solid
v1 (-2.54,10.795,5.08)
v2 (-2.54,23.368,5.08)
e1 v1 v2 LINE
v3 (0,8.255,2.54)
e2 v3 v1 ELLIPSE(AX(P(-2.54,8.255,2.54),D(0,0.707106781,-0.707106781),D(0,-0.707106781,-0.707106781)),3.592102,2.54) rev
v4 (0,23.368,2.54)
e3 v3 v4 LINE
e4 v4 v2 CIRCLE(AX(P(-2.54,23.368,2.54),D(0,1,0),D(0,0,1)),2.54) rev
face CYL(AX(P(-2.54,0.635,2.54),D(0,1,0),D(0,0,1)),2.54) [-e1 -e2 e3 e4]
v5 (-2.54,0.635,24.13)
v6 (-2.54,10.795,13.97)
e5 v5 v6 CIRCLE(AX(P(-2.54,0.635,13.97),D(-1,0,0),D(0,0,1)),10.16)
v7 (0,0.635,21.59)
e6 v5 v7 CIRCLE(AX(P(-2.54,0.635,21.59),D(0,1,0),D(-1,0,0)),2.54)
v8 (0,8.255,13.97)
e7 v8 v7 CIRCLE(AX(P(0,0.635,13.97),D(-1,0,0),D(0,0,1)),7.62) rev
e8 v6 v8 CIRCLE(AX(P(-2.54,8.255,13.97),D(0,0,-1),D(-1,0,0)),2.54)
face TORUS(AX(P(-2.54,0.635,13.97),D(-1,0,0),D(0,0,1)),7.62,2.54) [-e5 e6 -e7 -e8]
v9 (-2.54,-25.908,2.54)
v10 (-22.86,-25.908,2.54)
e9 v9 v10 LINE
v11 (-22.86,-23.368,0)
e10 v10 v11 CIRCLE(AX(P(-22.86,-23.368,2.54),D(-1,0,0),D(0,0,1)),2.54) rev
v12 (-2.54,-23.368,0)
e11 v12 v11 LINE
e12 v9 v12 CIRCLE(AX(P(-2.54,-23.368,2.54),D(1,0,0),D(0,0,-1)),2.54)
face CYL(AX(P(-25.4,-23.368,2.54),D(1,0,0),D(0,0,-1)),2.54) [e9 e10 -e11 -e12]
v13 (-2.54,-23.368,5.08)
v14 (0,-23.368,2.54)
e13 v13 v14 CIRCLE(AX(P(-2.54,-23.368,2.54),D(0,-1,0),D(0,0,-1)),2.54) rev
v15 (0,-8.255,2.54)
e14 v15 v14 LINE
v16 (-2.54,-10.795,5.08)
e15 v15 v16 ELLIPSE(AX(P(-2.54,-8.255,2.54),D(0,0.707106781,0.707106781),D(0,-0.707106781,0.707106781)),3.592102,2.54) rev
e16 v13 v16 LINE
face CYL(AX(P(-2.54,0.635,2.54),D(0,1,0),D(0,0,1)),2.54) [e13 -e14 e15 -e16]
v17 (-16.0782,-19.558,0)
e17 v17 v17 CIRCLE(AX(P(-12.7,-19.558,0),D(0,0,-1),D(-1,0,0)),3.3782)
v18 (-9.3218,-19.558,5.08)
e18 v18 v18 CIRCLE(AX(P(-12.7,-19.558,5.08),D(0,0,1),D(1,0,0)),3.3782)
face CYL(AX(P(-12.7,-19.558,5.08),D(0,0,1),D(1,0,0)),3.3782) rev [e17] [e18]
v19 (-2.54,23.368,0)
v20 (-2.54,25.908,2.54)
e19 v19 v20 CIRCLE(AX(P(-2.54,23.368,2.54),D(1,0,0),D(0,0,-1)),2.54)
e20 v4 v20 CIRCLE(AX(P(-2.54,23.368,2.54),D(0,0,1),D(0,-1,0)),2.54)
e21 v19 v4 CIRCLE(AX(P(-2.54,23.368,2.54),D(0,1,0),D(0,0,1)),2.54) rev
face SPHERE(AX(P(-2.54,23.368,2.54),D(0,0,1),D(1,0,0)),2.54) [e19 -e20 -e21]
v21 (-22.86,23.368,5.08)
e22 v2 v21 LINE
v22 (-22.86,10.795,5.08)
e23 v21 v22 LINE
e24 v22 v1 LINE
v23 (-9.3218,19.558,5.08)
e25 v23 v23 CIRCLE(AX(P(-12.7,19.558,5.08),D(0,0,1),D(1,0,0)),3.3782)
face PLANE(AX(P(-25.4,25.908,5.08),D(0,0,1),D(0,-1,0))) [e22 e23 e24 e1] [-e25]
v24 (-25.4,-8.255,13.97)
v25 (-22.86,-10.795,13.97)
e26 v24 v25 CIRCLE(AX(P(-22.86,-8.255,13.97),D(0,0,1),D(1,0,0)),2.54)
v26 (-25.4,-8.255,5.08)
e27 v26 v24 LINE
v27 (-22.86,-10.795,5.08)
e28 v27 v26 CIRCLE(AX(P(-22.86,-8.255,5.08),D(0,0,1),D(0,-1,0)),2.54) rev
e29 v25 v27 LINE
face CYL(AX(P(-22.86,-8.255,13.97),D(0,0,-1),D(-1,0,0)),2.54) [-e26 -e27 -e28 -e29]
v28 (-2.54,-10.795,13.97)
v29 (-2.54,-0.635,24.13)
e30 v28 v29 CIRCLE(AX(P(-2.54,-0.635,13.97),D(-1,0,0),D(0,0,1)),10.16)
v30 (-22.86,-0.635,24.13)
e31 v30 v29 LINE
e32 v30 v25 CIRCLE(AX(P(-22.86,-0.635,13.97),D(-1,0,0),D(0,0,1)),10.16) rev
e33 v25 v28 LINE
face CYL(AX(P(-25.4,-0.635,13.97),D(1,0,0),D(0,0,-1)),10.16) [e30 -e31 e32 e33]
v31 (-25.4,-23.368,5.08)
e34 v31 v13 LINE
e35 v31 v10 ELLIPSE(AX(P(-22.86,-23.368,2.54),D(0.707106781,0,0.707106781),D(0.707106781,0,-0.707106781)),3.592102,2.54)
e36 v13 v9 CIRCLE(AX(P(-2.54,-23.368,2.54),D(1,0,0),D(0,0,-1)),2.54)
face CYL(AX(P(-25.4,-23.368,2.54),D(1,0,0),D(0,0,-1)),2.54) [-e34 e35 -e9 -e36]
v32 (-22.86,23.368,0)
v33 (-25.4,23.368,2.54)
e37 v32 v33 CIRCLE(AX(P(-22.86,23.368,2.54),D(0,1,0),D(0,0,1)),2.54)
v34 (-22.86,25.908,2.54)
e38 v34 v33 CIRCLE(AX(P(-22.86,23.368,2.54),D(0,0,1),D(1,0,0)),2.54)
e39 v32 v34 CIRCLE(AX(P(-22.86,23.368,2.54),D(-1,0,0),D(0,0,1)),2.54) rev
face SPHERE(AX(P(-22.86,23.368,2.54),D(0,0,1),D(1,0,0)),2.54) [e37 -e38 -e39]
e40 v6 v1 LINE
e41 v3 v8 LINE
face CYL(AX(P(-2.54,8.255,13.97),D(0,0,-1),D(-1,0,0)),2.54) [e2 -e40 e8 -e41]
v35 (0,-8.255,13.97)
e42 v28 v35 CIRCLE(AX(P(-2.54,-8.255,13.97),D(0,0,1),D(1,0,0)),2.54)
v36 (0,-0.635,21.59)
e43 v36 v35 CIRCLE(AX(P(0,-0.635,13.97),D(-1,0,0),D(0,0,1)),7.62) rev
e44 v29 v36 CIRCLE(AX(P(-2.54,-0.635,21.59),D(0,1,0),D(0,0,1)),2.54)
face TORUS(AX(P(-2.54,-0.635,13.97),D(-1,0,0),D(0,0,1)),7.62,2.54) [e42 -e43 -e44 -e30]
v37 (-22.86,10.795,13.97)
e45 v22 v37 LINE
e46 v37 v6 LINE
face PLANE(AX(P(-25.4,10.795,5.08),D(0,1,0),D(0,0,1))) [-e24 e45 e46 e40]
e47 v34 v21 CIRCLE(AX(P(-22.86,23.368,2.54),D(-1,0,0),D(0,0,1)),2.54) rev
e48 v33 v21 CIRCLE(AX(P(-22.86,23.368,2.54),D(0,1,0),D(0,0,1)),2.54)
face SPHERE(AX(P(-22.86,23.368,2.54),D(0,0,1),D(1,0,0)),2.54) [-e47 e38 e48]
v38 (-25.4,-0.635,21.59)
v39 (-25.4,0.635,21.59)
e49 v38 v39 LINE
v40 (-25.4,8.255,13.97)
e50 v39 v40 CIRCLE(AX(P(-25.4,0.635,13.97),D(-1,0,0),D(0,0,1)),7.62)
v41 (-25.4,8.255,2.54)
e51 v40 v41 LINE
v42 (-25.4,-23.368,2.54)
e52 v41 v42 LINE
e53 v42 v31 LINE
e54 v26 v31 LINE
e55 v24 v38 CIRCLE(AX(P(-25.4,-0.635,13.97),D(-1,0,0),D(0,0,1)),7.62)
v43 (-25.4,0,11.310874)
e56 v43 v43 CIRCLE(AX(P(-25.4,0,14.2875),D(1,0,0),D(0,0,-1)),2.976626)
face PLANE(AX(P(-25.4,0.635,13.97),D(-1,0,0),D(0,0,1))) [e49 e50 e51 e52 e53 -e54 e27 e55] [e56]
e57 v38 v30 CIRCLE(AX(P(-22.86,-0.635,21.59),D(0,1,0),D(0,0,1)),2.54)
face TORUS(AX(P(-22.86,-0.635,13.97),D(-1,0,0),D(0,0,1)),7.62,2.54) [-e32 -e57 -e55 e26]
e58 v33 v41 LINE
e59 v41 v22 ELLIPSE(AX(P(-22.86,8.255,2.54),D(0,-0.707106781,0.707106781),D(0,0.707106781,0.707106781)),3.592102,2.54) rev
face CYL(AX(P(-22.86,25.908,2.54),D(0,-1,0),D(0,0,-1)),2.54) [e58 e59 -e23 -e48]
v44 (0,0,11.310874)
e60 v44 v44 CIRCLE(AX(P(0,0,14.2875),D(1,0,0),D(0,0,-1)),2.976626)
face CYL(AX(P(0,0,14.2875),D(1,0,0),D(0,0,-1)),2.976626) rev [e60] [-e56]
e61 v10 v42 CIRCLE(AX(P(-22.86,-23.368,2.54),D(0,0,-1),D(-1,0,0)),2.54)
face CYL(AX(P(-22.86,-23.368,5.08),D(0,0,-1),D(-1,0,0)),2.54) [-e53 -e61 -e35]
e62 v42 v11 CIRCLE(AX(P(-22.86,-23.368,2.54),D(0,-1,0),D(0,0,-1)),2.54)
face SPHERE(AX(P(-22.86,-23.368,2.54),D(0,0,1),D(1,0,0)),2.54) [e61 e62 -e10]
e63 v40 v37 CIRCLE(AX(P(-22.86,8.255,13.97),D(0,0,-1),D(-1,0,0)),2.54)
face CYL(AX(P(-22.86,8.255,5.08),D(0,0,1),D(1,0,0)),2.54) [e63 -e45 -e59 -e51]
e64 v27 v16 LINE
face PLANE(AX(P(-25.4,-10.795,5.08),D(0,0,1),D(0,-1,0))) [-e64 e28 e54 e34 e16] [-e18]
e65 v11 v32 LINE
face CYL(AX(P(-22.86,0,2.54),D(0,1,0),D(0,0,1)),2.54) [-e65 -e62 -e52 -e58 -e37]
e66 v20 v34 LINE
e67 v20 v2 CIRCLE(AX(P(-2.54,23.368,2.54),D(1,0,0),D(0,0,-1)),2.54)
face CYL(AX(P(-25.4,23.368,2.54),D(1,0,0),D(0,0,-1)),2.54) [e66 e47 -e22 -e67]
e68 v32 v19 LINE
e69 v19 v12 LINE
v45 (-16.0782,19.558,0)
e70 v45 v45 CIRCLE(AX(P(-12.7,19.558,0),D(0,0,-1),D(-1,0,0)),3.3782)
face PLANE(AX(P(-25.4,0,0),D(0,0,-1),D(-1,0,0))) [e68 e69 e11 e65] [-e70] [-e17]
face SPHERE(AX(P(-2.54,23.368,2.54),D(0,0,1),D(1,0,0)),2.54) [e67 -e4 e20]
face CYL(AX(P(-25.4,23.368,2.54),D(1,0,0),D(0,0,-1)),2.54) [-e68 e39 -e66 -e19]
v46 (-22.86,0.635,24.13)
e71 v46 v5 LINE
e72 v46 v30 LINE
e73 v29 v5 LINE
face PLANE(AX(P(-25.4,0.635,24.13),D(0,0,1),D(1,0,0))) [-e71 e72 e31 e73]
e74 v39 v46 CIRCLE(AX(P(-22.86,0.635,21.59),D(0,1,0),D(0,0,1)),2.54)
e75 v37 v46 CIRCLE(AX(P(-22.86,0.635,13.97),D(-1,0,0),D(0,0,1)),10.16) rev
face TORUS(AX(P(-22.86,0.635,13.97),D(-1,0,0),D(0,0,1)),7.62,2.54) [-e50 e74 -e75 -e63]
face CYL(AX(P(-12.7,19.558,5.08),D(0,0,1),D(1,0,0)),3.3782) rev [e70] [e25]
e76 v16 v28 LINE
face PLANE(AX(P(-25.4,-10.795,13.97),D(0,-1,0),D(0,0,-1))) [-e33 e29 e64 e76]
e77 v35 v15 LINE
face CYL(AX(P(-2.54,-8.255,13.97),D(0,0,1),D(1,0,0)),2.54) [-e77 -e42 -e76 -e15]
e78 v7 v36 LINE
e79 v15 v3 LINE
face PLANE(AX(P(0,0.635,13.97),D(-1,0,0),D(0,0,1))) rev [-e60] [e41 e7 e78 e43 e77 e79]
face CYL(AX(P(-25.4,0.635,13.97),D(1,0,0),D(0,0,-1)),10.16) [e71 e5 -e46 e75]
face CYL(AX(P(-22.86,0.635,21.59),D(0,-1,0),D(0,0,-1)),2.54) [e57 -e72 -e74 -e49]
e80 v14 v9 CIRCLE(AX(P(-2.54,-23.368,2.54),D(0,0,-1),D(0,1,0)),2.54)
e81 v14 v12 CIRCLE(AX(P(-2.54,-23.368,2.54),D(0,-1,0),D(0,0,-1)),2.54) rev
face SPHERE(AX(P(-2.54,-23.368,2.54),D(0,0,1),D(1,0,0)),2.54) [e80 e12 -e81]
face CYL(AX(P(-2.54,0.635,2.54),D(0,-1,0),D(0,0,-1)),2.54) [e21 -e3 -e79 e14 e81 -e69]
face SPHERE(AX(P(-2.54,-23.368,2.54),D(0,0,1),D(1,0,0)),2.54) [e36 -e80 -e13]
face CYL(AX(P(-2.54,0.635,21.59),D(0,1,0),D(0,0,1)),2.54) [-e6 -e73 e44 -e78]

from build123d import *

# Parameters (mm, degrees)
BOSS_EXTRUDE1_DEPTH                  = 25.4
F_15_64_0_23438_DIAMETER_HOLE1_D     = 5.953252
F_15_64_0_23438_DIAMETER_HOLE1_DEPTH = 25.4
F_15_64_0_23438_DIAMETER_HOLE1_TIP   = 1.788537341
F_1_4_CLEARANCE_HOLE1_D              = 6.7564
F_1_4_CLEARANCE_HOLE1_DEPTH          = 25.4
F_1_4_CLEARANCE_HOLE1_TIP            = 2.029827343
FILLET1_R                            = 2.54


with BuildPart() as part:
    # Sketch1 → Boss-Extrude1 (new body)
    with BuildSketch(Plane(origin=(0, 0, 0), x_dir=(0, 0, -1), z_dir=(1, 0, 0))):
        with BuildLine():
            Line((0, 0), (0, 25.908))
            Line((0, 25.908), (-5.08, 25.908))
            Line((-5.08, 25.908), (-5.08, 10.795))
            Line((-5.08, 10.795), (-13.97, 10.795))
            ThreePointArc((-13.97, 10.795), (-21.154204897, 7.819204897), (-24.13, 0.635))
            Line((-24.13, 0.635), (-24.13, -0.635))
            ThreePointArc((-24.13, -0.635), (-21.154204897, -7.819204897), (-13.97, -10.795))
            Line((-13.97, -10.795), (-5.08, -10.795))
            Line((-5.08, -10.795), (-5.08, -25.908))
            Line((-5.08, -25.908), (0, -25.908))
            Line((0, -25.908), (0, 0))
        make_face()
    extrude(amount=-BOSS_EXTRUDE1_DEPTH)

    # 15/64 (0.23438) Diameter Hole1
    with Locations(Plane(origin=(0, 0, 0), x_dir=(0, 0, -1), z_dir=(1, 0, 0))):
        with Locations((-14.2875, 0)):
            Hole(F_15_64_0_23438_DIAMETER_HOLE1_D / 2, depth=F_15_64_0_23438_DIAMETER_HOLE1_DEPTH)
            with Locations((0, 0, -(F_15_64_0_23438_DIAMETER_HOLE1_DEPTH + F_15_64_0_23438_DIAMETER_HOLE1_TIP / 2))):  # 118° drill point
                Cone(0, F_15_64_0_23438_DIAMETER_HOLE1_D / 2, F_15_64_0_23438_DIAMETER_HOLE1_TIP, mode=Mode.SUBTRACT)

    # 1/4 Clearance Hole1
    with Locations(Plane.XY.offset(5.08)):
        with Locations((-12.7, 19.558), (-12.7, -19.558)):
            Hole(F_1_4_CLEARANCE_HOLE1_D / 2, depth=F_1_4_CLEARANCE_HOLE1_DEPTH)
            with Locations((0, 0, -(F_1_4_CLEARANCE_HOLE1_DEPTH + F_1_4_CLEARANCE_HOLE1_TIP / 2))):  # 118° drill point
                Cone(0, F_1_4_CLEARANCE_HOLE1_D / 2, F_1_4_CLEARANCE_HOLE1_TIP, mode=Mode.SUBTRACT)

    # Fillet1
    fillet1_edges = [part.edges().sort_by_distance(p)[0] for p in [
        (0, -10.795, 9.525),
        (-25.4, -10.795, 9.525),
        (0, -7.819204897, 21.154204897),
        (-25.4, -7.819204897, 21.154204897),
        (0, -18.3515, 5.08),
        (-12.7, -25.908, 5.08),
        (0, 0, 24.13),
        (0, -25.908, 2.54),
        (0, 7.819204897, 21.154204897),
        (0, 0, 0),
        (0, 10.795, 9.525),
        (0, 25.908, 2.54),
        (0, 18.3515, 5.08),
        (-25.4, -25.908, 2.54),
        (-25.4, 0, 0),
        (-25.4, 25.908, 2.54),
        (-25.4, 18.3515, 5.08),
        (-25.4, 10.795, 9.525),
        (-25.4, 7.819204897, 21.154204897),
        (-25.4, 0, 24.13),
        (-12.7, -25.908, 0),
        (-12.7, 25.908, 0),
        (-12.7, 25.908, 5.08),
    ]]
    fillet(fillet1_edges, radius=FILLET1_R - 0.0001)  # a hair under: the kernel refuses the full size


solid = part.part
